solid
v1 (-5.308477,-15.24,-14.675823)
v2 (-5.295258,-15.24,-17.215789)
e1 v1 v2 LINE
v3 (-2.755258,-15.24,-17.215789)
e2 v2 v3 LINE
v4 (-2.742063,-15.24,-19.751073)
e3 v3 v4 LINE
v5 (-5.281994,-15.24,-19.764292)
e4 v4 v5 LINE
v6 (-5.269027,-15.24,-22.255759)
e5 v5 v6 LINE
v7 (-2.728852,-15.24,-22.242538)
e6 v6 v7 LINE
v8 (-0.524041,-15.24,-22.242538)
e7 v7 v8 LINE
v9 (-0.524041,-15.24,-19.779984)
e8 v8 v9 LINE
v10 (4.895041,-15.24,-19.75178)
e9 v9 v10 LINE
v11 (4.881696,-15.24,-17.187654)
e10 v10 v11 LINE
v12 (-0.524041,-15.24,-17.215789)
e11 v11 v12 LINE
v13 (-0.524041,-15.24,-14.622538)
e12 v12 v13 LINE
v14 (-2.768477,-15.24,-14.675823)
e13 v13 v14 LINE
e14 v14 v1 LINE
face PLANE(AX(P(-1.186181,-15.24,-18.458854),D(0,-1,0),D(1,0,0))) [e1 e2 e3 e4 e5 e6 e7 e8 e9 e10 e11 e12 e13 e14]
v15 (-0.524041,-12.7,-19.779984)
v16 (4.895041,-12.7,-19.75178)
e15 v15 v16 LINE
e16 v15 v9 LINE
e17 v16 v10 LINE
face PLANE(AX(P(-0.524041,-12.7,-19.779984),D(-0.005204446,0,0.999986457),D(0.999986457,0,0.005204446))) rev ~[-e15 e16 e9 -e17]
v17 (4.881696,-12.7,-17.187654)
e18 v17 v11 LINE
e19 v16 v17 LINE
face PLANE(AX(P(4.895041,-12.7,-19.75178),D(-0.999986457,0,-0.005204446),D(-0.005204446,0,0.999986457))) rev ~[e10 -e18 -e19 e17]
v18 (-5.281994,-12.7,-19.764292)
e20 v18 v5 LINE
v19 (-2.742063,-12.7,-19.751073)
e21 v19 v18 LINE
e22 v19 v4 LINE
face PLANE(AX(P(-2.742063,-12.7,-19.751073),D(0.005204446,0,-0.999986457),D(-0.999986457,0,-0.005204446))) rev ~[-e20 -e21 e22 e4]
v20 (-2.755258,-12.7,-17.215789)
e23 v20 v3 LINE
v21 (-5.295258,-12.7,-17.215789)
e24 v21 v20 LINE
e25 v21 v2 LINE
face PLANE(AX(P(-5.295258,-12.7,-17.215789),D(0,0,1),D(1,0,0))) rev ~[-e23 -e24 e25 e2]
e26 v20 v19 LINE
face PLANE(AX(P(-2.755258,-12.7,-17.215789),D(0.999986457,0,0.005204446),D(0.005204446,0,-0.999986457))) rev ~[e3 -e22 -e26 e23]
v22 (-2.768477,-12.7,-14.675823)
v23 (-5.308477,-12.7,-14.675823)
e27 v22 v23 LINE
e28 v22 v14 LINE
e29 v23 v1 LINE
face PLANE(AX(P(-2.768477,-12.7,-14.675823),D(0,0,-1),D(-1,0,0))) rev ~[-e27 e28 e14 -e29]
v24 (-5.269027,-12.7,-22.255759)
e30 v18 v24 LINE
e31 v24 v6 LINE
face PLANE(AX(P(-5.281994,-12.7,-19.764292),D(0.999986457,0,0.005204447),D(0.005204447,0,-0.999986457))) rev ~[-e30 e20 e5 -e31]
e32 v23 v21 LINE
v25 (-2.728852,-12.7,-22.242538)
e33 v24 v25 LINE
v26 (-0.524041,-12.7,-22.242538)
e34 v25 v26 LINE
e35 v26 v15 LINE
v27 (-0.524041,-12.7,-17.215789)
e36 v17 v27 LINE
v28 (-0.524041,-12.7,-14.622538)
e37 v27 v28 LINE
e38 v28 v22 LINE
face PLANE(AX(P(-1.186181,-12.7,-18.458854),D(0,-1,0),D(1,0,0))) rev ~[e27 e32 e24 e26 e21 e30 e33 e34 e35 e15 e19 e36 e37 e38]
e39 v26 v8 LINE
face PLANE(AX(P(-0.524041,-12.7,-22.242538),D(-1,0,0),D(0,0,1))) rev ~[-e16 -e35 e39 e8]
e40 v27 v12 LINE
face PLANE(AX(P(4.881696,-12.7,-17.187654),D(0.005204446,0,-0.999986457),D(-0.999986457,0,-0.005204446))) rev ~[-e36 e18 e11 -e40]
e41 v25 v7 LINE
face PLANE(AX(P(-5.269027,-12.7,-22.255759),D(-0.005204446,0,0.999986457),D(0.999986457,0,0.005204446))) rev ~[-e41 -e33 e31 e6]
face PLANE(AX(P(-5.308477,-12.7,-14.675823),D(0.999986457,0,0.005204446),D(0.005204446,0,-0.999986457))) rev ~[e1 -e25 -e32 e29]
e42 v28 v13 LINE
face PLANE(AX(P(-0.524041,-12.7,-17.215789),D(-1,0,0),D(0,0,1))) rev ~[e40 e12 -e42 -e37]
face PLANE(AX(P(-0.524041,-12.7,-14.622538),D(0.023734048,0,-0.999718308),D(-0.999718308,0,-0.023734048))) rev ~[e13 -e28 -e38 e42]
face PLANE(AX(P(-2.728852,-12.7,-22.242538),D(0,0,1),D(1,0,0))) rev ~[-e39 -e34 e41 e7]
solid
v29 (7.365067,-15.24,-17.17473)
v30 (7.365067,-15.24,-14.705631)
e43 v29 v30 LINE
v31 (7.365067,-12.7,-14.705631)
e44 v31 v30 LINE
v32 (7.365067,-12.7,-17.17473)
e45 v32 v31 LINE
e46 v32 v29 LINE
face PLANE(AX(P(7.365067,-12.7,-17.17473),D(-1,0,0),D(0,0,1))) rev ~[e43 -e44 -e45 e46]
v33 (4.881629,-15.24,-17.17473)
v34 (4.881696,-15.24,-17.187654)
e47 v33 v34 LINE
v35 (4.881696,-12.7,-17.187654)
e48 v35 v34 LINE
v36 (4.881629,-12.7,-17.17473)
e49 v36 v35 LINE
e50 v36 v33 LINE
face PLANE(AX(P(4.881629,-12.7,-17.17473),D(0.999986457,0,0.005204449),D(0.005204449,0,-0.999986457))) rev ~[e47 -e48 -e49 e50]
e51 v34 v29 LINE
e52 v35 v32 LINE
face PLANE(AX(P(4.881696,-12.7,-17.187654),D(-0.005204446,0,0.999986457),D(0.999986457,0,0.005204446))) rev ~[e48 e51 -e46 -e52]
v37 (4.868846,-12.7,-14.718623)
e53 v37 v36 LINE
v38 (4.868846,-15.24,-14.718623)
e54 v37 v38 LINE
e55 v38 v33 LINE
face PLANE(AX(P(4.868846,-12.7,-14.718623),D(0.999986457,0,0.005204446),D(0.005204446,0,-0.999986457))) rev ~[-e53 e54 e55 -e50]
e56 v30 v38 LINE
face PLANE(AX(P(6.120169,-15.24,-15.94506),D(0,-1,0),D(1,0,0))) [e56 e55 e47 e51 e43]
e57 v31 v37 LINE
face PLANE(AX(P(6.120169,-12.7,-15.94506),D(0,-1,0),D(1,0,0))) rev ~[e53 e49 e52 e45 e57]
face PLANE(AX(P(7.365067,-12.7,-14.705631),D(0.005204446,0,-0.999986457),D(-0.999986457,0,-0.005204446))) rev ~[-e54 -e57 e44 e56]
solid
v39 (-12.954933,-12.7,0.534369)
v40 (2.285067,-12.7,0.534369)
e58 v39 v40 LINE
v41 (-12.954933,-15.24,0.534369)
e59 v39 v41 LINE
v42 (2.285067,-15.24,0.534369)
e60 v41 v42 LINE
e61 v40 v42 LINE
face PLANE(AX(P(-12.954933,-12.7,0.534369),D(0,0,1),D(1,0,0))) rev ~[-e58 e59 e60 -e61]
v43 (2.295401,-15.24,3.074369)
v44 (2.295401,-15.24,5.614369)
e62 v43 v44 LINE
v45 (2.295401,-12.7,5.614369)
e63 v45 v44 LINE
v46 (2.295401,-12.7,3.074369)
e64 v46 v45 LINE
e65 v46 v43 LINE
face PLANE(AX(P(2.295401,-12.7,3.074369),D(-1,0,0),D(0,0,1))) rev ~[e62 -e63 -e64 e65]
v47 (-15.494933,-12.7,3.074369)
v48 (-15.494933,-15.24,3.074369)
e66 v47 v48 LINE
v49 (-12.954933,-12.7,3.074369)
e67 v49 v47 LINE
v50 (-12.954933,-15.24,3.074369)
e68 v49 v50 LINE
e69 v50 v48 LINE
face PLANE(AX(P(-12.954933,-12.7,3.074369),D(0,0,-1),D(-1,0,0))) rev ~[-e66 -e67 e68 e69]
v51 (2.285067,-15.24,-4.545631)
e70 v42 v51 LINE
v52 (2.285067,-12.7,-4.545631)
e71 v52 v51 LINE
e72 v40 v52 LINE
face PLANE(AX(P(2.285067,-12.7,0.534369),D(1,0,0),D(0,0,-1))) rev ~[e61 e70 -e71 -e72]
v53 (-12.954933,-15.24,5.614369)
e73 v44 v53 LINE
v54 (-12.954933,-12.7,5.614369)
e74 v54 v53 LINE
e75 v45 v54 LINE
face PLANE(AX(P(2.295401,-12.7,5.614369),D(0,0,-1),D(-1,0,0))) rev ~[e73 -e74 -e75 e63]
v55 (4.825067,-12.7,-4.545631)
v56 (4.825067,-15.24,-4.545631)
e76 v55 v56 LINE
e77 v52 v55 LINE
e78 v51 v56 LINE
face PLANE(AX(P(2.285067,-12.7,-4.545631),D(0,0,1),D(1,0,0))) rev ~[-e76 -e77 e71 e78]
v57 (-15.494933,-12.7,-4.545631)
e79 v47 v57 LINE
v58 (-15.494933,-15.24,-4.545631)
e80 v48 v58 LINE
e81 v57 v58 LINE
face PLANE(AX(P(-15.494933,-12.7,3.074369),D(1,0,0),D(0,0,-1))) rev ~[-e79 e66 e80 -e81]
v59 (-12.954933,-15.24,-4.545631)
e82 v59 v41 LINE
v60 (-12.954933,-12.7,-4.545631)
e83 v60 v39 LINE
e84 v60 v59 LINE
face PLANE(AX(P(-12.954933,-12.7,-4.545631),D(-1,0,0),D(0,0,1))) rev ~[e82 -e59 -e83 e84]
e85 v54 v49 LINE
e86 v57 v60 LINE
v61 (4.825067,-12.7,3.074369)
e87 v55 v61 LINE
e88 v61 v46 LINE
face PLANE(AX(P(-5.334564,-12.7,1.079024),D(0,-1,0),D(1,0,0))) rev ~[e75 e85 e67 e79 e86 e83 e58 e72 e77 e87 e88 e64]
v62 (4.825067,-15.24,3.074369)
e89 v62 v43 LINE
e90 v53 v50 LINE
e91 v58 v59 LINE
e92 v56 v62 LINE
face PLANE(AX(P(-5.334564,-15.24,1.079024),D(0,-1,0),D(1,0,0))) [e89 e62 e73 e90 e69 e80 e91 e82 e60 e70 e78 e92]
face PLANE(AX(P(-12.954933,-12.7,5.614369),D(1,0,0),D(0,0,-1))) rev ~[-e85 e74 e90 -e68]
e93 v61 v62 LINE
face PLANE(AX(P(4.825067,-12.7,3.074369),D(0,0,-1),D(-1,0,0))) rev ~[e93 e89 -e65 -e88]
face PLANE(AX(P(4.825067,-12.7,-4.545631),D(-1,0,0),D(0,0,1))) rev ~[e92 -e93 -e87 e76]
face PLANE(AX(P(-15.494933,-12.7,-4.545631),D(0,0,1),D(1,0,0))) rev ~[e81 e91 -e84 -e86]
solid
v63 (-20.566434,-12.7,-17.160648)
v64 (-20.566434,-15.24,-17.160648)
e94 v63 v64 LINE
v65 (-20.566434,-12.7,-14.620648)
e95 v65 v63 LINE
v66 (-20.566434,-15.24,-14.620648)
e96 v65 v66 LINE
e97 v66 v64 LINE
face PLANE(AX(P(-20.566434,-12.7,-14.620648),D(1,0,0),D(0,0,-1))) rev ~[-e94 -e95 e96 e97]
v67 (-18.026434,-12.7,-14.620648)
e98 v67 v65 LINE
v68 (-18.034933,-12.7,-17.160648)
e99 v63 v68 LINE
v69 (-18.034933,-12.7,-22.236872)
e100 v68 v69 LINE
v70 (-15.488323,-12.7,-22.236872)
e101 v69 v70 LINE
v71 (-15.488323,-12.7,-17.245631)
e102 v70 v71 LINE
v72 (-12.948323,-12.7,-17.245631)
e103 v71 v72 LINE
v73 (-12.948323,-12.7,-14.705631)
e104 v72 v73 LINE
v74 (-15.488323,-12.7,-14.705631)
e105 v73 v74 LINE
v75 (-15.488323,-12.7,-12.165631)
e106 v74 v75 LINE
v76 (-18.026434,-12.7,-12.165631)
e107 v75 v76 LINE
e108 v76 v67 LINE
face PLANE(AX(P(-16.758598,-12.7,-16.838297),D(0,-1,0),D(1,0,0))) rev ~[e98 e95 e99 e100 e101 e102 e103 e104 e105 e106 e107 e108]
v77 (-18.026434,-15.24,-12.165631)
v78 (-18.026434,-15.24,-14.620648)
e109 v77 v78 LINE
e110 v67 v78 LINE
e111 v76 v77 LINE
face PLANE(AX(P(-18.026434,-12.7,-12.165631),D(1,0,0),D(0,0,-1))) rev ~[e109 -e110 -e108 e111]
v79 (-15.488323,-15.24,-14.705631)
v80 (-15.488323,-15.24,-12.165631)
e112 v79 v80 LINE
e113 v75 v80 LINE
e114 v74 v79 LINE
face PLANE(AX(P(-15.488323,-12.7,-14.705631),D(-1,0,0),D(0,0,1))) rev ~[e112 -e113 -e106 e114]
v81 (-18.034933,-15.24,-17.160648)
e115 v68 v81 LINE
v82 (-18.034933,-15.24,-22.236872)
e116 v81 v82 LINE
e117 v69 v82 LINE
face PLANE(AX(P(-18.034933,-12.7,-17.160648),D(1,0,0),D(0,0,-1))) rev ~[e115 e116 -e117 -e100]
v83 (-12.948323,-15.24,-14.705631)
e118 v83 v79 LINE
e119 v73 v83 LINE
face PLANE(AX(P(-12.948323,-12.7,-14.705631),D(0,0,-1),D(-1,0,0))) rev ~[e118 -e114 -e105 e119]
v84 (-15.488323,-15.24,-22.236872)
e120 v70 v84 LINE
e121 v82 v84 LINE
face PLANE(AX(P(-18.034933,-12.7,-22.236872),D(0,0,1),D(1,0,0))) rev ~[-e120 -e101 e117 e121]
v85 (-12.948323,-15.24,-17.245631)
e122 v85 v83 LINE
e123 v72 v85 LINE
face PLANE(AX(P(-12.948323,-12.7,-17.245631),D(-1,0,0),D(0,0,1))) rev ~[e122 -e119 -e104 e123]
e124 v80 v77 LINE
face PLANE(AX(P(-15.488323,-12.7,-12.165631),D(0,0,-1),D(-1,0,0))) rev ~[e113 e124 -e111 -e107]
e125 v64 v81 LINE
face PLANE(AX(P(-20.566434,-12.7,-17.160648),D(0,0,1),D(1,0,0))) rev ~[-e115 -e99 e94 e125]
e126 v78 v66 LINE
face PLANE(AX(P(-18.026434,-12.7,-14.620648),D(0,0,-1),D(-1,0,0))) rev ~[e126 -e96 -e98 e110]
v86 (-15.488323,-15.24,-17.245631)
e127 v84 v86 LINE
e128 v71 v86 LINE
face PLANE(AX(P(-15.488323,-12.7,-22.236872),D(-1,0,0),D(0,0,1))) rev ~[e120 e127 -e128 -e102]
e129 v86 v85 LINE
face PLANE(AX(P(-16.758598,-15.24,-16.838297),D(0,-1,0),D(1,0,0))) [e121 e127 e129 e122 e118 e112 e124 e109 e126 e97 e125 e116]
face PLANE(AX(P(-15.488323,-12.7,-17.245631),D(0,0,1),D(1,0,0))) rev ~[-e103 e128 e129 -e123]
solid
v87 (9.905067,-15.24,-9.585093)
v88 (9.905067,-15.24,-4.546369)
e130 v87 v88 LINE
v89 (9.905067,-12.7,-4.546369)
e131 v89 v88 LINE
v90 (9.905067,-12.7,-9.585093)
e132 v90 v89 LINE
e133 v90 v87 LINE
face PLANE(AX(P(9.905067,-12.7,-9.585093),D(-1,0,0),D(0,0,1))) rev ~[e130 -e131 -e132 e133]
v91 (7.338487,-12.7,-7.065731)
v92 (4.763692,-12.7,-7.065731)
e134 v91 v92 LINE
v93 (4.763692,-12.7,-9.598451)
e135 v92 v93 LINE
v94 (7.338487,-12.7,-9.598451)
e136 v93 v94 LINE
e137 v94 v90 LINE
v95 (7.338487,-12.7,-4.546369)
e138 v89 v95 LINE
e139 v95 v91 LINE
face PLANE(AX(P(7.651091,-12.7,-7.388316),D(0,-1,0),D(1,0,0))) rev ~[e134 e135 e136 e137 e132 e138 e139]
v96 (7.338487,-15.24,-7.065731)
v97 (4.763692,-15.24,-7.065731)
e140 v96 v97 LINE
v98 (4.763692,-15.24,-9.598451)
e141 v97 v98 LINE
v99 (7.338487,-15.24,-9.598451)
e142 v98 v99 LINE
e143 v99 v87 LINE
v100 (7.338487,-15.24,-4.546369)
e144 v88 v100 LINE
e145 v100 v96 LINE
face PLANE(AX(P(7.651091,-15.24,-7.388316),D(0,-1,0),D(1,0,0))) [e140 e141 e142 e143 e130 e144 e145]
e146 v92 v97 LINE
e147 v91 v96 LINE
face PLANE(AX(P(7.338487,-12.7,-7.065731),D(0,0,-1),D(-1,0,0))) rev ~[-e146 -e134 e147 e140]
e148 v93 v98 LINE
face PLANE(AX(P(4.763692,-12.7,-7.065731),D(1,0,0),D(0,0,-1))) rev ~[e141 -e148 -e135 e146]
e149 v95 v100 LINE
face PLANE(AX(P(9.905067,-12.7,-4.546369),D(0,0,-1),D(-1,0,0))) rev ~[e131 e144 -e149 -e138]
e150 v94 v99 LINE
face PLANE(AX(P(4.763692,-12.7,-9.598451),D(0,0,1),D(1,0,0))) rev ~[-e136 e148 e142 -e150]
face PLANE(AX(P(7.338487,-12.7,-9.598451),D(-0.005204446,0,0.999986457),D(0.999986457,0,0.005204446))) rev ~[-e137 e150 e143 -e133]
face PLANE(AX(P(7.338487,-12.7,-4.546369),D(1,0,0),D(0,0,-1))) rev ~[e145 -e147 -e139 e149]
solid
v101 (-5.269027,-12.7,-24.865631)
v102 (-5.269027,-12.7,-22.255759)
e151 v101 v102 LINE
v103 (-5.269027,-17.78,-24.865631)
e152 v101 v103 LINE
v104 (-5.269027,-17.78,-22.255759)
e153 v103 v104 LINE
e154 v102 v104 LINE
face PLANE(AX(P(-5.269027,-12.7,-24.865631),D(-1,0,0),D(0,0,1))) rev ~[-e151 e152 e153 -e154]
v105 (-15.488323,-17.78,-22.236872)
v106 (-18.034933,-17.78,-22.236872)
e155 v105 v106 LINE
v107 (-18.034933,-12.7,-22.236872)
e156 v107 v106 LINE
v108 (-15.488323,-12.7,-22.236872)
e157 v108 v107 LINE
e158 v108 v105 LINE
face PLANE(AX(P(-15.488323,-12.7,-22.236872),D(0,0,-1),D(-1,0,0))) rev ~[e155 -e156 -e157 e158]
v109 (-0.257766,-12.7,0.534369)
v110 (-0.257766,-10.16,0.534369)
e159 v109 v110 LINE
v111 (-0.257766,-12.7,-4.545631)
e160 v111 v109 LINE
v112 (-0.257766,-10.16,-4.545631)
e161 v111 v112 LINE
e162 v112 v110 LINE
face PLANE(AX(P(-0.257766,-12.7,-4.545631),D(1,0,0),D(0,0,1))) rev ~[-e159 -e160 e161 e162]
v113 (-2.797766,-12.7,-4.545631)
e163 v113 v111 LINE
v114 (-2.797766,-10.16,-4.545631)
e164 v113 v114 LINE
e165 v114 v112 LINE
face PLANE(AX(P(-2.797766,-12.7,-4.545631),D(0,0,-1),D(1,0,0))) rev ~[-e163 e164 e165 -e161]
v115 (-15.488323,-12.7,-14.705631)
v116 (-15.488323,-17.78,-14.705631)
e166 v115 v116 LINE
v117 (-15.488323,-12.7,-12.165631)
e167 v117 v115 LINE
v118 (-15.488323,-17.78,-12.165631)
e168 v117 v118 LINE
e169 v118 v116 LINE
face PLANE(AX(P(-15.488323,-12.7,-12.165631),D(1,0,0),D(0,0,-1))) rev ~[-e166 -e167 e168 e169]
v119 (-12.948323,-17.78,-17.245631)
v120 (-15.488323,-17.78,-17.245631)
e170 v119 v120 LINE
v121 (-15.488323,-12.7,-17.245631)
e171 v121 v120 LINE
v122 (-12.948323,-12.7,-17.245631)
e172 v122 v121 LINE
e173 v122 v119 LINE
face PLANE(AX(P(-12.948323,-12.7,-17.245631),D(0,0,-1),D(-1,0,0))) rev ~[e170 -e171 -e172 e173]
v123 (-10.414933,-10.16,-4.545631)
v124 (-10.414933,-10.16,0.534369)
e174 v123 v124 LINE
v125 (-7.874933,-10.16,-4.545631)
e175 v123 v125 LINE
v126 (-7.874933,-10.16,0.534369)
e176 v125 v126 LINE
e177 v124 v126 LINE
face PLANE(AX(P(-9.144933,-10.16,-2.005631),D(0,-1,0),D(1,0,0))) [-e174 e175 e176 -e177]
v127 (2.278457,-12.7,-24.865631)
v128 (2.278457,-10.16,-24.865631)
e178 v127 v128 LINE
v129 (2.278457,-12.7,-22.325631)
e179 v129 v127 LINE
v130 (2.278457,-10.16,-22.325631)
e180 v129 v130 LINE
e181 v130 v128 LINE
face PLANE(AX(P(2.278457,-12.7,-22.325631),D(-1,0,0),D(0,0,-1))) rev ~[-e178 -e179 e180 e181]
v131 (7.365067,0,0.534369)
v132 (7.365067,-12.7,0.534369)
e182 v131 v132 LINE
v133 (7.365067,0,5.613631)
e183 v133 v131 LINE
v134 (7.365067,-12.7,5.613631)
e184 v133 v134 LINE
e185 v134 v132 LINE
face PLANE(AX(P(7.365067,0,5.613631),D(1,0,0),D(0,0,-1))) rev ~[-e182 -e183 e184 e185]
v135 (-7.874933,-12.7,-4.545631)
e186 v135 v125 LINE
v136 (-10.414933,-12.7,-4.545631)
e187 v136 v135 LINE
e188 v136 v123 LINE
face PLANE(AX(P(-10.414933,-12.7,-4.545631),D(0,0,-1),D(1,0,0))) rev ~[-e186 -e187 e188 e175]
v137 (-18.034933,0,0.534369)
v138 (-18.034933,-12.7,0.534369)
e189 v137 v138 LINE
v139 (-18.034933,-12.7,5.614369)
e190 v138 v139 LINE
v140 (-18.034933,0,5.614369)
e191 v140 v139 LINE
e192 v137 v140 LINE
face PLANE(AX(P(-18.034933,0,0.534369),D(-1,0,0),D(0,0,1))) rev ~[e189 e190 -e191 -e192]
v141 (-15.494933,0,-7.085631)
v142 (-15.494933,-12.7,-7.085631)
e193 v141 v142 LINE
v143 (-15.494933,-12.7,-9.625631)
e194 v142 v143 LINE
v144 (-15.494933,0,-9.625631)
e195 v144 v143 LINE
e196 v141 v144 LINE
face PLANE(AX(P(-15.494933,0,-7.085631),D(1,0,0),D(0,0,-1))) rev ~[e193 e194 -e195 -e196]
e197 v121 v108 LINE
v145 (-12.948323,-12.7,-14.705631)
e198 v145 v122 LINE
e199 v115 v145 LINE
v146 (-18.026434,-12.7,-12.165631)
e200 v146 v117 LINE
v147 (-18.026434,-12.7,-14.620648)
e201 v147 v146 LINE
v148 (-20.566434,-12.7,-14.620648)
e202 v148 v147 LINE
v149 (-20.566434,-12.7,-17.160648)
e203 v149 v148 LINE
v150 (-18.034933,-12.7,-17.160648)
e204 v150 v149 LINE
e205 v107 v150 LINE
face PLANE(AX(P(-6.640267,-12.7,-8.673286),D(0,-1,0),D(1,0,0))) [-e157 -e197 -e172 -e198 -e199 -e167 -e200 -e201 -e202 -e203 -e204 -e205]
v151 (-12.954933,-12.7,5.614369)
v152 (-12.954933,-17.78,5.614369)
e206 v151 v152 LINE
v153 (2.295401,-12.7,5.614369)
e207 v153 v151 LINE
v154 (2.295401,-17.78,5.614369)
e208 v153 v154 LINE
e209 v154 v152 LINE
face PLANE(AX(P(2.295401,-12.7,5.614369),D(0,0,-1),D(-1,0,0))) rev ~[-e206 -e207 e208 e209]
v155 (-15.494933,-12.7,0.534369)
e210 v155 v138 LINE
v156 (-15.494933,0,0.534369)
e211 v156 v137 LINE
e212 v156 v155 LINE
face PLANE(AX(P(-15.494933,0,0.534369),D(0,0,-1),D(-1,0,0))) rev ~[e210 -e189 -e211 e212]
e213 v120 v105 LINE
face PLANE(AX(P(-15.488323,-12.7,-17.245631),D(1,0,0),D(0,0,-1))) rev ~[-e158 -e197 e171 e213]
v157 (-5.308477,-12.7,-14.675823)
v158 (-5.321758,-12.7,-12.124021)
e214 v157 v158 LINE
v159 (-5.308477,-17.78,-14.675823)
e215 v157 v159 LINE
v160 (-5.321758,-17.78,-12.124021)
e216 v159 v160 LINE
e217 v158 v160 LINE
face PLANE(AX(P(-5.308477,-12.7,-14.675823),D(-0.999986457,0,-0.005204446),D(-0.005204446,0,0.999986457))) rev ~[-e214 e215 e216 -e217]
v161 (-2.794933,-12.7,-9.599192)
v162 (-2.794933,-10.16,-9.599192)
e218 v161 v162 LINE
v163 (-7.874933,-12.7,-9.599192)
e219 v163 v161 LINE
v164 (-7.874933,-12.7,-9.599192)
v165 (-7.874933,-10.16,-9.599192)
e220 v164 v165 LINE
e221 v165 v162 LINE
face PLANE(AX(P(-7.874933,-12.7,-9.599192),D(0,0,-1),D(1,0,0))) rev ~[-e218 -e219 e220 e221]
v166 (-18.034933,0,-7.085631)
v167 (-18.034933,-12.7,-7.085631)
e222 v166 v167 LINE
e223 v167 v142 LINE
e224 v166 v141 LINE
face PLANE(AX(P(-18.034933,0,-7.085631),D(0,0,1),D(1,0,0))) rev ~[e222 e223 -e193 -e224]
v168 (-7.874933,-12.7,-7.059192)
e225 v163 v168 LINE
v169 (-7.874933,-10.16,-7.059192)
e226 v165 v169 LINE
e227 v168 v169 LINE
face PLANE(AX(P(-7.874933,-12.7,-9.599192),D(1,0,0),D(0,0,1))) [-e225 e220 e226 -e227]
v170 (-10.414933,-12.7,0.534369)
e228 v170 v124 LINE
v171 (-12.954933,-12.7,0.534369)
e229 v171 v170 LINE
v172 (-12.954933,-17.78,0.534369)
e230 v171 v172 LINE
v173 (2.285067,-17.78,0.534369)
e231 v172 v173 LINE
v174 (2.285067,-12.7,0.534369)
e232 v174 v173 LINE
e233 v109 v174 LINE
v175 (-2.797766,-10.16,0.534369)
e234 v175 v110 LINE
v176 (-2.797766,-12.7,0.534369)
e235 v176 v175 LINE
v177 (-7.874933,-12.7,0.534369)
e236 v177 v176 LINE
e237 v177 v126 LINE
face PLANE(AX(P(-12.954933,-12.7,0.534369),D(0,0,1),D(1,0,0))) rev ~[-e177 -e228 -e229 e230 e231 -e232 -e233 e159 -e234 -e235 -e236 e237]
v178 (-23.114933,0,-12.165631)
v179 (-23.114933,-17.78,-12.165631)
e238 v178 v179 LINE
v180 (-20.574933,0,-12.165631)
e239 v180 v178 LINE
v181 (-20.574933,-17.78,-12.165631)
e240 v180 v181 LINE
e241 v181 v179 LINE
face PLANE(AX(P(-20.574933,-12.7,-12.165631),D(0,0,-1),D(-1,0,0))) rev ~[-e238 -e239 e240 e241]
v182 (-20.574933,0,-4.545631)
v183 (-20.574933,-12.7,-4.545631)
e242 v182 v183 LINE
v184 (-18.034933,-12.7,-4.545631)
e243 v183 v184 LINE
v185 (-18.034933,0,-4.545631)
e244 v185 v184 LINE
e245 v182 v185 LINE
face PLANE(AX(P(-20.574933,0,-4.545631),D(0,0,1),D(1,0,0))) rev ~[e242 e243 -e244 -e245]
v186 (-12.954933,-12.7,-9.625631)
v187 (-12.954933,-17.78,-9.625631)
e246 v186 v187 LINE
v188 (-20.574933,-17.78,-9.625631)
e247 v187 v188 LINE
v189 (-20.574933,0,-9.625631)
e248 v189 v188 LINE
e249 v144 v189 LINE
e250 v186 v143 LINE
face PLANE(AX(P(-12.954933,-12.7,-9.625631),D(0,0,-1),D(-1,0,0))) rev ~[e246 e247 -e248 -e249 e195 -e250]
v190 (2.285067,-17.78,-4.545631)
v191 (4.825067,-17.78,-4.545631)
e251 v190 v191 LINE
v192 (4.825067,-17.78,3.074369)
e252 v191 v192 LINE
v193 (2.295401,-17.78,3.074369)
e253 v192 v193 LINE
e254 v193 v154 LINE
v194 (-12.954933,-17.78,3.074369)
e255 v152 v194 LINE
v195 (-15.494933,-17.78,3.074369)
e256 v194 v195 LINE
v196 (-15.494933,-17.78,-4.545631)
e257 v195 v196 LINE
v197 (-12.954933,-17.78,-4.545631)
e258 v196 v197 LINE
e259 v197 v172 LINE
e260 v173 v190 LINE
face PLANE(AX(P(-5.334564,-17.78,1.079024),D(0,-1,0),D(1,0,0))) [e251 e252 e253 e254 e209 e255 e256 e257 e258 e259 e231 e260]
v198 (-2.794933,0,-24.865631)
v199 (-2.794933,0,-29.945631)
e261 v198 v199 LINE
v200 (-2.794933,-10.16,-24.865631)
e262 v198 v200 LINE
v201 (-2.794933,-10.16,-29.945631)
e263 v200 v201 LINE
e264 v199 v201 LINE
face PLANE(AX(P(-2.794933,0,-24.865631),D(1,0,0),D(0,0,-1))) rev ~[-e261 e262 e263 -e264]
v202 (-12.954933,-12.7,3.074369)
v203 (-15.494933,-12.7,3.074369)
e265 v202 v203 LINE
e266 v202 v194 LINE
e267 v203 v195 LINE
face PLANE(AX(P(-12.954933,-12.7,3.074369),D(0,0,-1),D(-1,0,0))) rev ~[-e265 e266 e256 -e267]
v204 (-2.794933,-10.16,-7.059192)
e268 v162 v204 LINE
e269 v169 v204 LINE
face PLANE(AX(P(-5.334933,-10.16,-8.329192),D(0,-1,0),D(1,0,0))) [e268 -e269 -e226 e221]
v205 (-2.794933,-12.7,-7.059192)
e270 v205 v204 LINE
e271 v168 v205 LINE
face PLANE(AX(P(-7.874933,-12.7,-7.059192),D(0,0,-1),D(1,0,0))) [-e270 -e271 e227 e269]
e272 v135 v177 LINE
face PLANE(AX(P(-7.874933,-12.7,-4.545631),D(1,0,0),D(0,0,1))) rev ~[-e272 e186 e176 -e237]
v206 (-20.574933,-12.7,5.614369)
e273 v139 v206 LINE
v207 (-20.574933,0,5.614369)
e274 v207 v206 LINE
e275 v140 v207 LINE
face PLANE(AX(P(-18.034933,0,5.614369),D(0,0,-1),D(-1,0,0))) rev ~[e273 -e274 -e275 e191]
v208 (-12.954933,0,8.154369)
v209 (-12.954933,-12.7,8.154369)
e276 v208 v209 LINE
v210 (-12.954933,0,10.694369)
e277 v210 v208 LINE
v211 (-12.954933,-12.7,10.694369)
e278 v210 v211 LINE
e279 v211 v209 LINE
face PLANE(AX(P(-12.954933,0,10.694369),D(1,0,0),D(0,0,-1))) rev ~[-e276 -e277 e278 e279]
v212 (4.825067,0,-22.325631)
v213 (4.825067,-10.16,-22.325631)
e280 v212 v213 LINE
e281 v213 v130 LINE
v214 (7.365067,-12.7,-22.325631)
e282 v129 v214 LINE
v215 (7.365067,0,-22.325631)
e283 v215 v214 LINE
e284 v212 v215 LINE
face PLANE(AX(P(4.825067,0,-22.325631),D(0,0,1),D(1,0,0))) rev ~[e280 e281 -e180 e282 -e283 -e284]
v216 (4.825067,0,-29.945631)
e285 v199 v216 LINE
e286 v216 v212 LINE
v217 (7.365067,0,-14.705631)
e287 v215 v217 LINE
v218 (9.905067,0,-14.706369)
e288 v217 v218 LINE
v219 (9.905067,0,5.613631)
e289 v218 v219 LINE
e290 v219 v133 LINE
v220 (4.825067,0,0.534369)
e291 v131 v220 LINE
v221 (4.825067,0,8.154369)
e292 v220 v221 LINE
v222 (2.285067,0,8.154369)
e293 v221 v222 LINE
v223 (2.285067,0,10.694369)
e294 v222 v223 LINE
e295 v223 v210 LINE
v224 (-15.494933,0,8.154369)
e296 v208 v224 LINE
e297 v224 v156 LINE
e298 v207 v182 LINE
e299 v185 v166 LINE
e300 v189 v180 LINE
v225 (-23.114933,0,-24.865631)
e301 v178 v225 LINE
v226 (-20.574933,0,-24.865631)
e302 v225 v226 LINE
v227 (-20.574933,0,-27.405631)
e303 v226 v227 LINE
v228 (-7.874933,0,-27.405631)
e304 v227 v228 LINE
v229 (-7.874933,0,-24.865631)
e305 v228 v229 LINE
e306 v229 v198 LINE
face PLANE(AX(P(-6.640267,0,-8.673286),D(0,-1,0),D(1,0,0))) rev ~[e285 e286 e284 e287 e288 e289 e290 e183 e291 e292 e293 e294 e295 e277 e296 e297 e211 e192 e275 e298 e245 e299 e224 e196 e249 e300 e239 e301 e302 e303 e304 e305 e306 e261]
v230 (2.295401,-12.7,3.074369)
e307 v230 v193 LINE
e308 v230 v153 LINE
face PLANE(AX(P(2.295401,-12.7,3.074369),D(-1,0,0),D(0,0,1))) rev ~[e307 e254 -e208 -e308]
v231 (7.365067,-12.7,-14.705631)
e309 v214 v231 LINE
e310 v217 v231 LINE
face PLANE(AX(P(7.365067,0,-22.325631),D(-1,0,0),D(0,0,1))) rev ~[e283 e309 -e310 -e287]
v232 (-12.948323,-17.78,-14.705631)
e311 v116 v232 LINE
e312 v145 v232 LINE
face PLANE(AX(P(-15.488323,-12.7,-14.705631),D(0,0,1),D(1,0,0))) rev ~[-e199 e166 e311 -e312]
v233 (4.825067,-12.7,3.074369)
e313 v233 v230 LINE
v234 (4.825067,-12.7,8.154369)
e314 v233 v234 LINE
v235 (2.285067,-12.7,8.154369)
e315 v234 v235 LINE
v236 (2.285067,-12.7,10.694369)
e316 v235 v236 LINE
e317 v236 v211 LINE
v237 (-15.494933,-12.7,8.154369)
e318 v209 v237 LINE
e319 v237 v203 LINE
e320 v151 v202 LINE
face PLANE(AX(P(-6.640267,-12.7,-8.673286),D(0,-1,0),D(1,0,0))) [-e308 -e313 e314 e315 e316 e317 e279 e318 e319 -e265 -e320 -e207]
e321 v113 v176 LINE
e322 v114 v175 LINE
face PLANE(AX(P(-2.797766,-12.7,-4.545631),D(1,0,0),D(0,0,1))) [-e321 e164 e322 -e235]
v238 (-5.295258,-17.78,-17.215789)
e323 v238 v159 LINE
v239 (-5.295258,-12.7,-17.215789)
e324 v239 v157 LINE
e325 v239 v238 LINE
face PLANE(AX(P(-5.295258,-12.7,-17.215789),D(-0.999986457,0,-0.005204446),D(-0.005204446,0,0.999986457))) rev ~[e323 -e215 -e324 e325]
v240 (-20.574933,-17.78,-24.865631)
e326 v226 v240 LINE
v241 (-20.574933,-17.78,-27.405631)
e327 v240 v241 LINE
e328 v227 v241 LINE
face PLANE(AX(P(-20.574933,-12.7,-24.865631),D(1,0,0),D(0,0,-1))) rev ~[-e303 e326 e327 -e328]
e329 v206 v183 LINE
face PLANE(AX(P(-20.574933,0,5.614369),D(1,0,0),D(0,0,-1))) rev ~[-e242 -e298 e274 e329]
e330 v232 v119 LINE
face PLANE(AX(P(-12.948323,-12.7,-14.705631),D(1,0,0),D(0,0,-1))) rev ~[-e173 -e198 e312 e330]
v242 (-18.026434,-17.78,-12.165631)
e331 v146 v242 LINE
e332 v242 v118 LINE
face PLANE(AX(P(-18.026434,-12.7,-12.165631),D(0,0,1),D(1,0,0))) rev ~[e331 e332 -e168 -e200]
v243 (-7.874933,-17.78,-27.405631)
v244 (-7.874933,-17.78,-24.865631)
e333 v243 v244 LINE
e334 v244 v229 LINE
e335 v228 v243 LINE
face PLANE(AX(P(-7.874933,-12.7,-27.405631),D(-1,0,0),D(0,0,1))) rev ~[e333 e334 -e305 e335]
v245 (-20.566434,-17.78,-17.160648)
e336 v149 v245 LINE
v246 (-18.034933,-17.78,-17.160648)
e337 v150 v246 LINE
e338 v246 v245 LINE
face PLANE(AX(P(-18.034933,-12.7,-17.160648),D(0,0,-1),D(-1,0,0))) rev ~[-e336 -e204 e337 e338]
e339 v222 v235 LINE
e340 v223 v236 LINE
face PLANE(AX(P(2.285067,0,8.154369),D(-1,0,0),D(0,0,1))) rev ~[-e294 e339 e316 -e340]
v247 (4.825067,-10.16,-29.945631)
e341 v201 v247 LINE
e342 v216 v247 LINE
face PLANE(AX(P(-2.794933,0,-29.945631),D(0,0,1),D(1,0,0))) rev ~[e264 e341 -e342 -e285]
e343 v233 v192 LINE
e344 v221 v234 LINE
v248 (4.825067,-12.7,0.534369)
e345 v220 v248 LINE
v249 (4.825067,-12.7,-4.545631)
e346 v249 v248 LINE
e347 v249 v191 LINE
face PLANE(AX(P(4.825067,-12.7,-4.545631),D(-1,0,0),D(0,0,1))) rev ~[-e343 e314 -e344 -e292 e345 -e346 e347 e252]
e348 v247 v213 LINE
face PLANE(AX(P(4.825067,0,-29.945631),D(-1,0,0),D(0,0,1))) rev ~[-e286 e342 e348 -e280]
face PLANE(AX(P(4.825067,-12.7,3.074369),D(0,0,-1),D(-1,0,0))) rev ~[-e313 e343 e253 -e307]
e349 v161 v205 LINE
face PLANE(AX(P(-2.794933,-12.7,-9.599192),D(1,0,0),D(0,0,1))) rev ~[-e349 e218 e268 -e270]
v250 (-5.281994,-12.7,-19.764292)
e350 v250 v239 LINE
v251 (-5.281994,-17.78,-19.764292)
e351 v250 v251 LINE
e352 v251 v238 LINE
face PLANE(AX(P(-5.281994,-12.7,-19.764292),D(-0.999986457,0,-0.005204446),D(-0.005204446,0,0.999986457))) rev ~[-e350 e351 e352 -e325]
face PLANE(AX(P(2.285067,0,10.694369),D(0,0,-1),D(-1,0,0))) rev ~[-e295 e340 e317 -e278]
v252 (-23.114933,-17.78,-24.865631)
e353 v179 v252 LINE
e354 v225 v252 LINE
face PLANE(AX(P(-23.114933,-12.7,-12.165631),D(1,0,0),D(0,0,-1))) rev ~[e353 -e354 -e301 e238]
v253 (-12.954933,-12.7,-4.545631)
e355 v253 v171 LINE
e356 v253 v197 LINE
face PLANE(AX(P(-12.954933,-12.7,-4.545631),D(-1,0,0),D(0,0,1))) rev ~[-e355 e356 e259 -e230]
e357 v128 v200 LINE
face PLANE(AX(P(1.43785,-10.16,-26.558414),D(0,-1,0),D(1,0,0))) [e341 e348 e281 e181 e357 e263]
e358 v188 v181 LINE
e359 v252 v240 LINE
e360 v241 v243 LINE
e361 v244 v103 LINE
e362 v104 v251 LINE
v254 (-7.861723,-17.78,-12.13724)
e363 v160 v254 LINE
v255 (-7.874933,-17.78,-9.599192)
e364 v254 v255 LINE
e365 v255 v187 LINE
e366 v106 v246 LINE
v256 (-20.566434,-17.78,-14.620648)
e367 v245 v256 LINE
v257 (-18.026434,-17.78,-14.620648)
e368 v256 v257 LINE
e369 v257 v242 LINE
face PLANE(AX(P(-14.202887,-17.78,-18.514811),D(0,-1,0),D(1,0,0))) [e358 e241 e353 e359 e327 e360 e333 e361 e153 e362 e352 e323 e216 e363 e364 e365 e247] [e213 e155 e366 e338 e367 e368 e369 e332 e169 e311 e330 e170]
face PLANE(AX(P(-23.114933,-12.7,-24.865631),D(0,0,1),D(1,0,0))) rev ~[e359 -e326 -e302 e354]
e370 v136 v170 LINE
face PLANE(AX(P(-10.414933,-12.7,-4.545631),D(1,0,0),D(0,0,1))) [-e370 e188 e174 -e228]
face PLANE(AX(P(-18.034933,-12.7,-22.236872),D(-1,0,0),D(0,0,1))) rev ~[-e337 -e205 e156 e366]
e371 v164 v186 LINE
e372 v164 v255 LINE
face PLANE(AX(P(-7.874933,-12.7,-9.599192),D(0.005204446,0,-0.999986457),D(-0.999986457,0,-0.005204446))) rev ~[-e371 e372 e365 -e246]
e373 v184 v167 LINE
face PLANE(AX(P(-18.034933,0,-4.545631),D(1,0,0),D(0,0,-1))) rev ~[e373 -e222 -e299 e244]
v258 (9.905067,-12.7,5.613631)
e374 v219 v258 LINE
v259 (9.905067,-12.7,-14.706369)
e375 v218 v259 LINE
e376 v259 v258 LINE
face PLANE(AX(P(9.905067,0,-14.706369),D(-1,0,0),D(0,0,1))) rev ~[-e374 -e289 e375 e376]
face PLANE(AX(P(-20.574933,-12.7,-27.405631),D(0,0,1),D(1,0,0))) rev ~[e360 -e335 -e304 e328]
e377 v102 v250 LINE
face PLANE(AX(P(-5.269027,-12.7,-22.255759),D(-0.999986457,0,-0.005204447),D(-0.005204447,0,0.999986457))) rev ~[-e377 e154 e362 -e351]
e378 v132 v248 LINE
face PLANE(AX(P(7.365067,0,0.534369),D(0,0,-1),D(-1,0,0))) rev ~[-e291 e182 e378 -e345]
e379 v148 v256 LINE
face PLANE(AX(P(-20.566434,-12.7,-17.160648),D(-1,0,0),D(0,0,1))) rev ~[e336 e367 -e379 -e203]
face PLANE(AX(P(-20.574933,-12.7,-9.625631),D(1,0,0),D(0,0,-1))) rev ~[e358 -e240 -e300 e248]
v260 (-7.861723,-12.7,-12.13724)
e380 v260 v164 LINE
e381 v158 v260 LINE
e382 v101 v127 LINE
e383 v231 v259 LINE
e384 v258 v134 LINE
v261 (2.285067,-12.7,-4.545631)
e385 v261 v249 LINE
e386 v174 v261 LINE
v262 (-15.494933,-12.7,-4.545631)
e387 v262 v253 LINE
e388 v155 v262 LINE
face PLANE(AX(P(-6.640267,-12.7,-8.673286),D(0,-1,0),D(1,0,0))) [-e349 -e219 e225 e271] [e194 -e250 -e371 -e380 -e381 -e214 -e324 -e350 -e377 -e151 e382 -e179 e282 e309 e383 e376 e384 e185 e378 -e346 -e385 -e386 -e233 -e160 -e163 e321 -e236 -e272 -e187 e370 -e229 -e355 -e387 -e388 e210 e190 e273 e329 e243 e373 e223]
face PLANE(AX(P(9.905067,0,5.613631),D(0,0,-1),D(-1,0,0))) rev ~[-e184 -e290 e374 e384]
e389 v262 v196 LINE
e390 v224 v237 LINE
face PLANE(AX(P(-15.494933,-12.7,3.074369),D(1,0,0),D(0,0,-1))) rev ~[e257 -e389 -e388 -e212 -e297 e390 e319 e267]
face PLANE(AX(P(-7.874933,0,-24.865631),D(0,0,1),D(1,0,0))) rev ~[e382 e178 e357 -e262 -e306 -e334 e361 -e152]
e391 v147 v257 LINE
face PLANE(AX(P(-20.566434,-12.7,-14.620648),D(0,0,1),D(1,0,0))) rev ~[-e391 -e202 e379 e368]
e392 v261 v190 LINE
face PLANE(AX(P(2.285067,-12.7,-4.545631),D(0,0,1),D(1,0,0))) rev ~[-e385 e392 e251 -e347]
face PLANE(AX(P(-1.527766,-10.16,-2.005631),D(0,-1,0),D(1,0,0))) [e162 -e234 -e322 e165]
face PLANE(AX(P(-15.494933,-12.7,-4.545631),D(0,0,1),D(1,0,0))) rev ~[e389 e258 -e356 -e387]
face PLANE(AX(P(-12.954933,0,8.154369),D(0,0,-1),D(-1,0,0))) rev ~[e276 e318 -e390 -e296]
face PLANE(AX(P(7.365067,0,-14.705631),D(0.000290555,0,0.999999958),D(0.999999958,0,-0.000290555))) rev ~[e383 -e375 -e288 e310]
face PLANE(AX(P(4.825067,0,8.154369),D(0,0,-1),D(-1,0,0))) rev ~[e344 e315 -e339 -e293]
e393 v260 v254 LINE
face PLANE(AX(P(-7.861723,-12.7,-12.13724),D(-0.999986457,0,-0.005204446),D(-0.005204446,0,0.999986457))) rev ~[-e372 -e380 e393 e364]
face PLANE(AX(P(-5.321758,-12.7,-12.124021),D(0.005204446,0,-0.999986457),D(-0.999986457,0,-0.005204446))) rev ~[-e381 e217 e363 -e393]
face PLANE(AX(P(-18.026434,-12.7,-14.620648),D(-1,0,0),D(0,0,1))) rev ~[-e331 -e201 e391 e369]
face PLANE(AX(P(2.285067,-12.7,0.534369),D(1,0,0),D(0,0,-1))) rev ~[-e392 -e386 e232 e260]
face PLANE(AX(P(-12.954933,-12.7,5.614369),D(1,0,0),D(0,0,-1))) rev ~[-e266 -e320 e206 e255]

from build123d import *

# Parameters (mm, degrees)
F1_DEPTH = 12.7
F3_DEPTH = 5.08
F4_DEPTH = 2.54
F2_W     = 2.54
F2_H     = 5.08
F2_W_2   = 5.08
F2_H_2   = 2.54
F5_DEPTH = 2.54


# Not quite as in the source:
# - a feature names something its author has since deleted; it is built from what else it names


with BuildPart() as f1:
    # F0 (on Front) → F1 (new body)
    with BuildSketch(Plane.XZ):
        Polygon((2.285067299, 10.6943689859), (-12.954932701, 10.6943689859), (-12.954932701, 8.1543689859), (-15.494932701, 8.1543689859), (-15.494932701, 0.5343689859), (-18.034932701, 0.5343689859), (-18.034932701, 5.6143689859), (-20.574932701, 5.6143689859), (-20.574932701, -4.5456310141), (-18.034932701, -4.5456310141), (-18.034932701, -7.0856310141), (-15.494932701, -7.0856310141), (-15.494932701, -9.6256310141), (-20.574932701, -9.6256310141), (-20.574932701, -12.1656310141), (-23.114932701, -12.1656310141), (-23.114932701, -24.8656310141), (-20.574932701, -24.8656310141), (-20.574932701, -27.4056310141), (-7.874932701, -27.4056310141), (-7.874932701, -24.8656310141), (-2.794932701, -24.8656310141), (-2.794932701, -29.9456310141), (4.825067299, -29.9456310141), (4.825067299, -22.3256310141), (7.365067299, -22.3256310141), (7.365067299, -14.7056310141), (9.905067299, -14.7063690238), (9.905067299, 5.6136309762), (7.365067299, 5.6136309762), (7.365067299, 0.5343689859), (4.825067299, 0.5343689859), (4.825067299, 8.1543689859), (2.285067299, 8.1543689859), align=None)
    extrude(amount=F1_DEPTH)

    # F2 (on face) → F3 (join)
    with BuildSketch(Plane.XZ.offset(12.7)):
        Polygon((-12.954932701, -9.6256310141), (-15.494932701, -9.6256310141), (-20.574932701, -9.6256310141), (-20.574932701, -12.1656310141), (-23.114932701, -12.1656310141), (-23.114932701, -24.8656310141), (-20.574932701, -24.8656310141), (-20.574932701, -27.4056310141), (-7.874932701, -27.4056310141), (-7.874932701, -24.8656310141), (-5.2690269849, -24.8656310141), (-5.2690269849, -22.2557587346), (-5.2819938649, -19.7642921814), (-5.2952575954, -17.2157885193), (-5.3084768894, -14.6758229191), (-5.3217577861, -12.124020931), (-7.8617233863, -12.1372402251), (-7.874932701, -9.599192068), align=None)
        Polygon((-18.0264338851, -14.6206484801), (-18.0264338851, -12.1656310141), (-15.4883228242, -12.1656310141), (-15.4883228242, -14.7056310141), (-12.9483228242, -14.7056310141), (-12.9483228242, -17.2456310141), (-15.4883228242, -17.2456310141), (-15.4883228242, -22.2368724644), (-18.034932701, -22.2368724644), (-18.034932701, -17.1606484801), (-20.5664338851, -17.1606484801), (-20.5664338851, -14.6206484801), align=None, mode=Mode.SUBTRACT)
        Polygon((-12.954932701, 3.0743689859), (-15.494932701, 3.0743689859), (-15.494932701, 0.5343689859), (-15.494932701, -4.5456310141), (-12.954932701, -4.5456310141), (-12.954932701, 0.5343689859), (-10.414932701, 0.5343689859), (-7.874932701, 0.5343689859), (-2.7977656573, 0.5343689859), (-0.2577656573, 0.5343689859), (2.285067299, 0.5343689859), (2.285067299, -4.5456310141), (4.825067299, -4.5456310141), (4.825067299, 0.5343689859), (4.825067299, 3.0743689859), (2.2954009473, 3.0743689859), (2.2954009473, 5.6143689859), (-12.954932701, 5.6143689859), align=None)
    extrude(amount=F3_DEPTH)

    # F2 (on face) → F5 (cut)
    with BuildSketch(Plane.XZ.offset(12.7)):
        with Locations((-9.144932701, -2.0056310141)):
            Rectangle(F2_W, F2_H)
        with Locations((-1.5277656573, -2.0056310141)):
            Rectangle(F2_W, F2_H)
        with Locations((-5.334932701, -8.329192068)):
            Rectangle(F2_W_2, F2_H_2)
        Polygon((4.825067299, -24.8656310141), (4.825067299, -22.3256310141), (2.2784571629, -22.3256310141), (2.2784571629, -24.8656310141), (-2.794932701, -24.8656310141), (-2.794932701, -29.9456310141), (4.825067299, -29.9456310141), align=None)
    extrude(amount=-F5_DEPTH, mode=Mode.SUBTRACT)


with BuildPart() as f4:
    # F2 (on face) → F4 (new body)
    with BuildSketch(Plane.XZ.offset(12.7)):
        Polygon((-12.954932701, 3.0743689859), (-15.494932701, 3.0743689859), (-15.494932701, 0.5343689859), (-15.494932701, -4.5456310141), (-12.954932701, -4.5456310141), (-12.954932701, 0.5343689859), (-10.414932701, 0.5343689859), (-7.874932701, 0.5343689859), (-2.7977656573, 0.5343689859), (-0.2577656573, 0.5343689859), (2.285067299, 0.5343689859), (2.285067299, -4.5456310141), (4.825067299, -4.5456310141), (4.825067299, 0.5343689859), (4.825067299, 3.0743689859), (2.2954009473, 3.0743689859), (2.2954009473, 5.6143689859), (-12.954932701, 5.6143689859), align=None)
    extrude(amount=F4_DEPTH)


with BuildPart() as f4b:
    # F2 (on face) → F4, piece 2 (new body)
    with BuildSketch(Plane.XZ.offset(12.7)):
        Polygon((-15.4883228242, -12.1656310141), (-18.0264338851, -12.1656310141), (-18.0264338851, -14.6206484801), (-20.5664338851, -14.6206484801), (-20.5664338851, -17.1606484801), (-18.034932701, -17.1606484801), (-18.034932701, -22.2368724644), (-15.4883228242, -22.2368724644), (-15.4883228242, -17.2456310141), (-12.9483228242, -17.2456310141), (-12.9483228242, -14.7056310141), (-15.4883228242, -14.7056310141), align=None)
    extrude(amount=F4_DEPTH)


with BuildPart() as f4c:
    # F2 (on face) → F4, piece 3 (new body)
    with BuildSketch(Plane.XZ.offset(12.7)):
        Polygon((9.905067299, -9.585092935), (9.905067299, -4.5463690238), (7.3384868927, -4.5463690238), (7.3384868927, -7.0657309794), (4.7636916861, -7.0657309794), (4.7636916861, -9.5984507462), (7.3384868927, -9.5984507462), align=None)
    extrude(amount=F4_DEPTH)


with BuildPart() as f4d:
    # F2 (on face) → F4, piece 4 (new body)
    with BuildSketch(Plane.XZ.offset(12.7)):
        Polygon((7.365067299, -17.1747295235), (7.365067299, -14.7056310141), (4.8688458945, -14.7186226407), (4.8816287444, -17.1747295235), (4.8816960115, -17.1876542714), align=None)
    extrude(amount=F4_DEPTH)


with BuildPart() as f4e:
    # F2 (on face) → F4, piece 5 (new body)
    with BuildSketch(Plane.XZ.offset(12.7)):
        Polygon((-2.7684768894, -14.6758229191), (-5.3084768894, -14.6758229191), (-5.2952575954, -17.2157885193), (-2.7552575954, -17.2157885193), (-2.742062664, -19.7510730664), (-5.2819938649, -19.7642921814), (-5.2690269849, -22.2557587346), (-2.7288519475, -22.2425383505), (-0.5240406026, -22.2425383505), (-0.5240406026, -19.7799838678), (4.8950410482, -19.7517801655), (4.8816960115, -17.1876542714), (-0.5240406026, -17.2157885193), (-0.5240406026, -14.6225383505), align=None)
    extrude(amount=F4_DEPTH)


solid = Compound([f1.part, f4.part, f4b.part, f4c.part, f4d.part, f4e.part])
